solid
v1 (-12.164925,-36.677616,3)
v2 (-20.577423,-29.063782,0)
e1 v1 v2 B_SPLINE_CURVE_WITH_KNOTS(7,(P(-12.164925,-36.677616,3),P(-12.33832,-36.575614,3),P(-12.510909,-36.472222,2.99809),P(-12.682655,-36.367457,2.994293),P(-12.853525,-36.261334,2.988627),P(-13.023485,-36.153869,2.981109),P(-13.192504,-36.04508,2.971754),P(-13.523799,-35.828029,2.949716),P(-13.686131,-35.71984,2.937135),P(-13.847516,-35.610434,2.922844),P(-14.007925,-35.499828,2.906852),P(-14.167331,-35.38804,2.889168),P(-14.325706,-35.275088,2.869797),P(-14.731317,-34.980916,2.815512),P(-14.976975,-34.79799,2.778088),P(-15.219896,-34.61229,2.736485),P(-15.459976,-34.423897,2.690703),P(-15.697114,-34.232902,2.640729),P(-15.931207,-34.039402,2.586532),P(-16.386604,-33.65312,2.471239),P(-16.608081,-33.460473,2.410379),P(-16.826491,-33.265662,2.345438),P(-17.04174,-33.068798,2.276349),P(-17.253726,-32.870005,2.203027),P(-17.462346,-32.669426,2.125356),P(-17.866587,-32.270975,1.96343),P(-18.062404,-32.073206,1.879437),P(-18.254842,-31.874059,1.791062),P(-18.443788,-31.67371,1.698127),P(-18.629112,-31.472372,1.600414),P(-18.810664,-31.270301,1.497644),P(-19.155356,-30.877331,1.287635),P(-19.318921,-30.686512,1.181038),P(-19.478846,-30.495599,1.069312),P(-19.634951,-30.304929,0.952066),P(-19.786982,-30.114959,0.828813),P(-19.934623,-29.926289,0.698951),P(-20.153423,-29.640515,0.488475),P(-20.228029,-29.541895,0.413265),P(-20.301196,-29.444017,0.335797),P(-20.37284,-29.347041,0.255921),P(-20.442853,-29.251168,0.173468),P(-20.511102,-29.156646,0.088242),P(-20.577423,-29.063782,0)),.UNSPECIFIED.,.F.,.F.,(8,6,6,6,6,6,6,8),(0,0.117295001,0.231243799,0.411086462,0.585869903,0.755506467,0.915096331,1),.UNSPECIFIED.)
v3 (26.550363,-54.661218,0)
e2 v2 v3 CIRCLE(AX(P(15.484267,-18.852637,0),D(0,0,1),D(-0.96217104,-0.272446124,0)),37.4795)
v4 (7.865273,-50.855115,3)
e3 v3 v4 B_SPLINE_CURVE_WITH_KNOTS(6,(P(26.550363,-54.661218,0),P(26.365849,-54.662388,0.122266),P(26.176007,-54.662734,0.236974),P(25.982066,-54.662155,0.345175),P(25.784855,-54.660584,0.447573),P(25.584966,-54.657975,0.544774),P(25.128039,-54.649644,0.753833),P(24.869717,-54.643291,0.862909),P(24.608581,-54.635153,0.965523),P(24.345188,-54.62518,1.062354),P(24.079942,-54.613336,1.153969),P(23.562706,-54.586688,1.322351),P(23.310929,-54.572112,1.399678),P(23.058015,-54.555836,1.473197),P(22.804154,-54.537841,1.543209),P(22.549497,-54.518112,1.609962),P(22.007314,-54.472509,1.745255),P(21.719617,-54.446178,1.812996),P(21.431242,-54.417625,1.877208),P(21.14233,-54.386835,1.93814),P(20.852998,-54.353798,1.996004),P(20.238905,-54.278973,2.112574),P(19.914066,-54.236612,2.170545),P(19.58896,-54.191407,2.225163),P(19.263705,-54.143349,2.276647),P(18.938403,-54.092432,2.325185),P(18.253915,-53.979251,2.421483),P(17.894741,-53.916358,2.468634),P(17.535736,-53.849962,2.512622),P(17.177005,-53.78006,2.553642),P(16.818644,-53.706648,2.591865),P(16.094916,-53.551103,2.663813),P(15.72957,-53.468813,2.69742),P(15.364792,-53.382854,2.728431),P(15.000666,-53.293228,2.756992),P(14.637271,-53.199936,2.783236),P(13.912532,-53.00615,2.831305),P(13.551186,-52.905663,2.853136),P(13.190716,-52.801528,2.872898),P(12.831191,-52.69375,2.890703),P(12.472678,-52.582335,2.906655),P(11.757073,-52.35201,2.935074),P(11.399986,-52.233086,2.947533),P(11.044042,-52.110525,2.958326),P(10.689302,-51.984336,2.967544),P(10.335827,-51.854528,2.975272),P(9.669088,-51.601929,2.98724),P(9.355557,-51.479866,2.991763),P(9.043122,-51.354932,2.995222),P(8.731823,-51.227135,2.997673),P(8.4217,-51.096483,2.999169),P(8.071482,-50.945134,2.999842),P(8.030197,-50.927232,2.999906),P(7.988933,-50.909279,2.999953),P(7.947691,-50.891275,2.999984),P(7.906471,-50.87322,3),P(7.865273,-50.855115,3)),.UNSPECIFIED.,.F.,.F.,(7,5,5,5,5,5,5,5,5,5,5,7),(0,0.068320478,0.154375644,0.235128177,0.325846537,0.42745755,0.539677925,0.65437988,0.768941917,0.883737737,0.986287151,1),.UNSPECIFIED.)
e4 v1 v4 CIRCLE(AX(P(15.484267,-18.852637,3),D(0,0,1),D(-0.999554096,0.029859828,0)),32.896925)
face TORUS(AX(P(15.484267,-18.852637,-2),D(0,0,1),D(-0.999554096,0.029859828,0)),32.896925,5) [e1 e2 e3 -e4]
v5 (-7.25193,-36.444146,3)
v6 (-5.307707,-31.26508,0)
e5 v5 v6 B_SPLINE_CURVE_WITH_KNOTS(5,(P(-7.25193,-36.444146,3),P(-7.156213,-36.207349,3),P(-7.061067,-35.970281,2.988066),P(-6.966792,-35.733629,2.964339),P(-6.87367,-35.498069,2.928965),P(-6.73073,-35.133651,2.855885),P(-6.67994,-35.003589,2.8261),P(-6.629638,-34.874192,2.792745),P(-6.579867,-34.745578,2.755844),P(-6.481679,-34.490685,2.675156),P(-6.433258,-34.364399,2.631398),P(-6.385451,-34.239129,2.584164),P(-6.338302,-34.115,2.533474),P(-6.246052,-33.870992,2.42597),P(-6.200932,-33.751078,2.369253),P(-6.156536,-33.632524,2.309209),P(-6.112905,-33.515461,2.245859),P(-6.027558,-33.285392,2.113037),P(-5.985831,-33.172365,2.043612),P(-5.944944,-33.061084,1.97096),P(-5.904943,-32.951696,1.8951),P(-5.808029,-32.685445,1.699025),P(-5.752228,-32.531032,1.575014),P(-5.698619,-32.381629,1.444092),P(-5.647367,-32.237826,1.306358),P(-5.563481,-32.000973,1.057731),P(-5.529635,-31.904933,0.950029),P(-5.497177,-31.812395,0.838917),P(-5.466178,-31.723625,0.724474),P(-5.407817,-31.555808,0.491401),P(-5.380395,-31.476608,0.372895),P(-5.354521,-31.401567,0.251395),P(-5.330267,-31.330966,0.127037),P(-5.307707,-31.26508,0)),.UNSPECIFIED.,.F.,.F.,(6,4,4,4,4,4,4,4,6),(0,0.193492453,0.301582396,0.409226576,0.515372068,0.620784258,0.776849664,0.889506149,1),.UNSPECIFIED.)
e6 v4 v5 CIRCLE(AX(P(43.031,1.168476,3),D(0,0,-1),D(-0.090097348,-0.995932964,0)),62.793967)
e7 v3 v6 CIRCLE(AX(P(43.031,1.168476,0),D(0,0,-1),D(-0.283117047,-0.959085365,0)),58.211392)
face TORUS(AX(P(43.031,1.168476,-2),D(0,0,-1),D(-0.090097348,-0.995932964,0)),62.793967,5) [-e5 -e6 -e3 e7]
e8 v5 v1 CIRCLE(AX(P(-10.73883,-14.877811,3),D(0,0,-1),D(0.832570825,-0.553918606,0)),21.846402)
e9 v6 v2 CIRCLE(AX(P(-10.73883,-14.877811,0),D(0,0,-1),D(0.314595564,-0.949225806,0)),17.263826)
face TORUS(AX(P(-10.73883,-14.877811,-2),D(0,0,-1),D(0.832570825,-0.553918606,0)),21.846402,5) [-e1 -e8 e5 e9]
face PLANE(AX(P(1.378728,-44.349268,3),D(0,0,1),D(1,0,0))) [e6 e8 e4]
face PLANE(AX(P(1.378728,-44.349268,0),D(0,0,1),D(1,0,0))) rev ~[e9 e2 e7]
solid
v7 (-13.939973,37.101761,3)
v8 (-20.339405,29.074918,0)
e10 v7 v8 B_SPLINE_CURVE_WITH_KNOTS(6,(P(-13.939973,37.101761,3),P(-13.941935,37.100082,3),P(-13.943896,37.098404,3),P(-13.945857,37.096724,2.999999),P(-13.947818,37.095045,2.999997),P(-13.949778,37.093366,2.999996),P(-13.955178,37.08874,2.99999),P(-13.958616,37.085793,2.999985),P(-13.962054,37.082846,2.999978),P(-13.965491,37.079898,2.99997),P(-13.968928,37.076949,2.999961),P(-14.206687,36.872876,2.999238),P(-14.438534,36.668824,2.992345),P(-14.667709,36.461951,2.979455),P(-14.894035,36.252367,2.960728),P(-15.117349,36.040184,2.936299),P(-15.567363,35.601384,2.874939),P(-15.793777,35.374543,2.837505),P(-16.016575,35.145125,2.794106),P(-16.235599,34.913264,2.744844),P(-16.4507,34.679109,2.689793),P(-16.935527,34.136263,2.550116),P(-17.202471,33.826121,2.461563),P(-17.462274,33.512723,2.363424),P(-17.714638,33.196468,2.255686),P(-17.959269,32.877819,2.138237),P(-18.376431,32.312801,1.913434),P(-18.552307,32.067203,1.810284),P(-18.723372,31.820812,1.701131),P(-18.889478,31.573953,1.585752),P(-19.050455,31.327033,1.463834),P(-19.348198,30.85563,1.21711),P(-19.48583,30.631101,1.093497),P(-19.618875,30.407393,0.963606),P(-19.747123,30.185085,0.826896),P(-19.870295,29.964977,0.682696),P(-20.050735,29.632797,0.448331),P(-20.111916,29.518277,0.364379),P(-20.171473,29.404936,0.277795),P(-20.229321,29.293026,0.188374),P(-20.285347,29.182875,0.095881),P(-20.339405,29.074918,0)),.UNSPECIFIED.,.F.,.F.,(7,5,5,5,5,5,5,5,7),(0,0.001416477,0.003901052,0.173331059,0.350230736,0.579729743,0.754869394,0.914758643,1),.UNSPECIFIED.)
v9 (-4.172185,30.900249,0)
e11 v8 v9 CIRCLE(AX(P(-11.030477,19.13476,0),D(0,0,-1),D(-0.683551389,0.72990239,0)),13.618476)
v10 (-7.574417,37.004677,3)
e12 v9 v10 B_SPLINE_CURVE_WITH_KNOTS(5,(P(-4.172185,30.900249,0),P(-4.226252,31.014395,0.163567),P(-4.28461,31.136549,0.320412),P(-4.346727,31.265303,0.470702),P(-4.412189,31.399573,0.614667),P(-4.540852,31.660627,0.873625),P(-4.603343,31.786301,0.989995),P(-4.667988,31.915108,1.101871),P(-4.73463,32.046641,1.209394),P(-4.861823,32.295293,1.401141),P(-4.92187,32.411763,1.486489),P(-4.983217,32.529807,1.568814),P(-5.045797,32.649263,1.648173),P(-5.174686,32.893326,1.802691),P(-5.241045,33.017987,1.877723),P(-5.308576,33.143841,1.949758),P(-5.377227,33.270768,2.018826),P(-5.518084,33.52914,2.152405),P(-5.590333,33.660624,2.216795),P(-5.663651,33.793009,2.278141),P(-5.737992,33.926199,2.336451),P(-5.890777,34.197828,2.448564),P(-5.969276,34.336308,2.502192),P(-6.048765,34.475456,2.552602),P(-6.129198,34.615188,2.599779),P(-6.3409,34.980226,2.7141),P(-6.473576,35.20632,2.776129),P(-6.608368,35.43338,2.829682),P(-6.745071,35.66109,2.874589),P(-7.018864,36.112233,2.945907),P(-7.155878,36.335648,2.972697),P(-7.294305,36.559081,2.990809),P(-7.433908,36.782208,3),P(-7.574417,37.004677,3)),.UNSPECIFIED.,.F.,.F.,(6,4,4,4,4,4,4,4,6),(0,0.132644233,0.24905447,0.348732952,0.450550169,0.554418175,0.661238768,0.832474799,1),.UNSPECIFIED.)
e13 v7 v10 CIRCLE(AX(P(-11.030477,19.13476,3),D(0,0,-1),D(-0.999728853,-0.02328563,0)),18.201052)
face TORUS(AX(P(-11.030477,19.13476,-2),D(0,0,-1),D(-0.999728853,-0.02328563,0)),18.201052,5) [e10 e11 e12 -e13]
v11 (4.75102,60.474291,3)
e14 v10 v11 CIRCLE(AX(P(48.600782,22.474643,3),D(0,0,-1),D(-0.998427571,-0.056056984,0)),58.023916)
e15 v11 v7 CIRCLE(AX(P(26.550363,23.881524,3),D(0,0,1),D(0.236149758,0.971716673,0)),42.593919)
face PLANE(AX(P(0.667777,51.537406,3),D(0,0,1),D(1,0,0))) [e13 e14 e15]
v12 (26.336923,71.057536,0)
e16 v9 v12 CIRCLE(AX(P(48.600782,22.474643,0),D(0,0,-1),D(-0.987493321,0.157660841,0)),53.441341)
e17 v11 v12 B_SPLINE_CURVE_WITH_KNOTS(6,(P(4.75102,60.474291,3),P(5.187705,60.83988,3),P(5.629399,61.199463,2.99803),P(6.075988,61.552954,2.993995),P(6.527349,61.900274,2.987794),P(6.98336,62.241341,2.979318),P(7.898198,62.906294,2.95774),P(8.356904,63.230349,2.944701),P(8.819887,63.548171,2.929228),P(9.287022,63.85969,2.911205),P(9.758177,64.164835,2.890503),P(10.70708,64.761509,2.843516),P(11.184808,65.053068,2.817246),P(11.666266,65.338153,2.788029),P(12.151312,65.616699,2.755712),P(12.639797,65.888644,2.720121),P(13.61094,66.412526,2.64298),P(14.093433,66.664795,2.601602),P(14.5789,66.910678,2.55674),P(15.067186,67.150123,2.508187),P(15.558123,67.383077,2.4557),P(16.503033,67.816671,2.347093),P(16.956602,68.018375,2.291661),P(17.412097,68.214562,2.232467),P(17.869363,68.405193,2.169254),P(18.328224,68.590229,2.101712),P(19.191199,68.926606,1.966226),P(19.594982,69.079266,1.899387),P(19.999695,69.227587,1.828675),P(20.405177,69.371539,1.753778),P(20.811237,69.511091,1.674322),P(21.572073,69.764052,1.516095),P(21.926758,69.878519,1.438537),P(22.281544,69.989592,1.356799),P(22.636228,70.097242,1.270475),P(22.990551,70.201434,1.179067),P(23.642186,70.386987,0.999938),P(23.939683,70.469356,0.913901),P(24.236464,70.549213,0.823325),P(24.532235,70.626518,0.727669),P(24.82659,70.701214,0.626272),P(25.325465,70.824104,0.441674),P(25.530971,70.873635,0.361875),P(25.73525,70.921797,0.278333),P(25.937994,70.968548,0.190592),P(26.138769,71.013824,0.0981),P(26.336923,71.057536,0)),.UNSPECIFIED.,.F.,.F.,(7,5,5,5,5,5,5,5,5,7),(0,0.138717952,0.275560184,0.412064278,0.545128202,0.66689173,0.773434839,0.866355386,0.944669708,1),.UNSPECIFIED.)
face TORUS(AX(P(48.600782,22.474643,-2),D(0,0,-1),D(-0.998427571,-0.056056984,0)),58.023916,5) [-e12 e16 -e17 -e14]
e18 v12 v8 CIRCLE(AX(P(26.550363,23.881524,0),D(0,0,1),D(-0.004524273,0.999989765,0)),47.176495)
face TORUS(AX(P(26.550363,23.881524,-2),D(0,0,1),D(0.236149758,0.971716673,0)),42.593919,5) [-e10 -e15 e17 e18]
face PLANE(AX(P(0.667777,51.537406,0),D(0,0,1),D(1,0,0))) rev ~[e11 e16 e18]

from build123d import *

# Parameters (mm, degrees)
F4_DEPTH      = 3
F5_T2_ANGLE   = 62.2477049864
F5_T4_ANGLE   = 129.1340791789
F5_T6_ANGLE   = 126.4050370347
F5_2_T2_ANGLE = 80.8778277447
F5_2_T4_ANGLE = 111.257856834
F5_2_T6_ANGLE = 169.7853810378


# Not quite as in the source:
# - a fillet or chamfer that OpenCascade refuses, or shapes differently, is made with other operations: its cross-section is extruded or revolved along the edge and cut away or added
# - a feature of the source that left no trace in its solid (it failed there, or was rolled back) is left out
# - the program builds the solid bodies; features that only make, move or delete a surface that nothing else refers to are left out


with BuildPart() as f4:
    # F3 (on Top) → F4 (new body)
    with BuildSketch(Plane.XY):
        with BuildLine():
            ThreePointArc((-5.3077070042, -31.2650799751), (-13.2021361292, -31.9649934775), (-20.5774232745, -29.0637817234))
            ThreePointArc((-20.5774232745, -29.0637817234), (-2.4043363453, -51.7875856508), (26.5503625851, -54.6612180769))
            ThreePointArc((26.5503625851, -54.6612180769), (8.5747716437, -45.7499050222), (-5.3077070042, -31.2650799751))
        make_face()
    extrude(amount=F4_DEPTH)

    # F5: fillet of radius 5 on 3 edges, made by hand

    # F5_s1 → F5_t2 (revolve, cut)
    with BuildSketch(Plane(origin=(42.5768459914, -3.8517260252, 0), x_dir=(0, 0, 1), z_dir=(0.9959329635, -0.0900973481, 0))):
        with BuildLine():
            ThreePointArc((0, 53.1706891683), (2.1833001327, 55.0146520758), (3, 57.7532648633))
            Line((3, 57.7532648633), (3, 53.1706891683))
            Line((3, 53.1706891683), (0, 53.1706891683))
        make_face()
    revolve(axis=Axis((43.0309999283, 1.1684758534, 3), (0, 0, -1)), revolution_arc=F5_T2_ANGLE, mode=Mode.SUBTRACT)

    # F5_s3 → F5_t4 (revolve, cut)
    with BuildSketch(Plane(origin=(-10.1562466974, -15.2654101251, 0), x_dir=(0, 0, 1), z_dir=(0.5539186056, 0.8325708248, 0))):
        with BuildLine():
            ThreePointArc((0, 16.5640855704), (2.1833001327, 18.4080484779), (3, 21.1466612654))
            Line((3, 21.1466612654), (3, 16.5640855704))
            Line((3, 16.5640855704), (0, 16.5640855704))
        make_face()
    revolve(axis=Axis((-10.7388300445, -14.8778109616, 3), (0, 0, -1)), revolution_arc=F5_T4_ANGLE, mode=Mode.SUBTRACT)

    # F5_s5 → F5_t6 (revolve, cut)
    with BuildSketch(Plane(origin=(-0.548879568, -18.3736765408, 0), x_dir=(0, 0, 1), z_dir=(0.029859828, 0.9995540959, 0))):
        with BuildLine():
            ThreePointArc((0, -21.4392018096), (2.1833001327, -19.5952389021), (3, -16.8566261146))
            Line((3, -16.8566261146), (3, -21.4392018096))
            Line((3, -21.4392018096), (0, -21.4392018096))
        make_face()
    revolve(axis=Axis((15.4842666098, -18.8526370977, 3), (0, 0, 1)), revolution_arc=F5_T6_ANGLE, mode=Mode.SUBTRACT)


with BuildPart() as f4b:
    # F3 (on Top) → F4, piece 2 (new body)
    with BuildSketch(Plane.XY):
        with BuildLine():
            ThreePointArc((-4.1721854359, 30.9002492577), (6.0474831917, 54.8040980412), (26.3369232416, 71.057535708))
            ThreePointArc((26.3369232416, 71.057535708), (-4.9982200607, 58.9572788508), (-20.3394051641, 29.0749184787))
            ThreePointArc((-20.3394051641, 29.0749184787), (-12.5583392109, 32.6672592136), (-4.1721854359, 30.9002492577))
        make_face()
    extrude(amount=F4_DEPTH)

    # F5#2: fillet of radius 5 on 3 edges, made by hand

    # F5_2_s1 → F5_2_t2 (revolve, cut)
    with BuildSketch(Plane(origin=(-1.1051572436, 19.683889291, 0), x_dir=(0, 0, 1), z_dir=(0.0560569838, -0.998427571, 0))):
        with BuildLine():
            ThreePointArc((0, 3.6571197259), (2.1833001327, 5.5010826334), (3, 8.2396954209))
            Line((3, 8.2396954209), (3, 3.6571197259))
            Line((3, 3.6571197259), (0, 3.6571197259))
        make_face()
    revolve(axis=Axis((48.6007815653, 22.4746425569, 3), (0, 0, -1)), revolution_arc=F5_2_T2_ANGLE, mode=Mode.SUBTRACT)

    # F5_2_s3 → F5_2_t4 (revolve, cut)
    with BuildSketch(Plane(origin=(19.5896273479, -4.7607351825, 0), x_dir=(0, 0, 1), z_dir=(0.9717166727, -0.2361497577, 0))):
        with BuildLine():
            ThreePointArc((0, -76.6524312792), (2.1833001327, -74.8084683718), (3, -72.0698555843))
            Line((3, -72.0698555843), (3, -76.6524312792))
            Line((3, -76.6524312792), (0, -76.6524312792))
        make_face()
    revolve(axis=Axis((26.5503625851, 23.8815236574, 3), (0, 0, 1)), revolution_arc=F5_2_T4_ANGLE, mode=Mode.SUBTRACT)

    # F5_2_s5 → F5_2_t6 (revolve, cut)
    with BuildSketch(Plane(origin=(-0.4514250872, 19.3811668147, 0), x_dir=(0, 0, 1), z_dir=(0.0232856303, -0.999728853, 0))):
        with BuildLine():
            ThreePointArc((0, 24.2003972309), (2.1833001327, 26.0443601383), (3, 28.7829729258))
            Line((3, 28.7829729258), (3, 24.2003972309))
            Line((3, 24.2003972309), (0, 24.2003972309))
        make_face()
    revolve(axis=Axis((-11.0304768119, 19.1347601151, 3), (0, 0, -1)), revolution_arc=F5_2_T6_ANGLE, mode=Mode.SUBTRACT)


solid = Compound([f4.part, f4b.part])
